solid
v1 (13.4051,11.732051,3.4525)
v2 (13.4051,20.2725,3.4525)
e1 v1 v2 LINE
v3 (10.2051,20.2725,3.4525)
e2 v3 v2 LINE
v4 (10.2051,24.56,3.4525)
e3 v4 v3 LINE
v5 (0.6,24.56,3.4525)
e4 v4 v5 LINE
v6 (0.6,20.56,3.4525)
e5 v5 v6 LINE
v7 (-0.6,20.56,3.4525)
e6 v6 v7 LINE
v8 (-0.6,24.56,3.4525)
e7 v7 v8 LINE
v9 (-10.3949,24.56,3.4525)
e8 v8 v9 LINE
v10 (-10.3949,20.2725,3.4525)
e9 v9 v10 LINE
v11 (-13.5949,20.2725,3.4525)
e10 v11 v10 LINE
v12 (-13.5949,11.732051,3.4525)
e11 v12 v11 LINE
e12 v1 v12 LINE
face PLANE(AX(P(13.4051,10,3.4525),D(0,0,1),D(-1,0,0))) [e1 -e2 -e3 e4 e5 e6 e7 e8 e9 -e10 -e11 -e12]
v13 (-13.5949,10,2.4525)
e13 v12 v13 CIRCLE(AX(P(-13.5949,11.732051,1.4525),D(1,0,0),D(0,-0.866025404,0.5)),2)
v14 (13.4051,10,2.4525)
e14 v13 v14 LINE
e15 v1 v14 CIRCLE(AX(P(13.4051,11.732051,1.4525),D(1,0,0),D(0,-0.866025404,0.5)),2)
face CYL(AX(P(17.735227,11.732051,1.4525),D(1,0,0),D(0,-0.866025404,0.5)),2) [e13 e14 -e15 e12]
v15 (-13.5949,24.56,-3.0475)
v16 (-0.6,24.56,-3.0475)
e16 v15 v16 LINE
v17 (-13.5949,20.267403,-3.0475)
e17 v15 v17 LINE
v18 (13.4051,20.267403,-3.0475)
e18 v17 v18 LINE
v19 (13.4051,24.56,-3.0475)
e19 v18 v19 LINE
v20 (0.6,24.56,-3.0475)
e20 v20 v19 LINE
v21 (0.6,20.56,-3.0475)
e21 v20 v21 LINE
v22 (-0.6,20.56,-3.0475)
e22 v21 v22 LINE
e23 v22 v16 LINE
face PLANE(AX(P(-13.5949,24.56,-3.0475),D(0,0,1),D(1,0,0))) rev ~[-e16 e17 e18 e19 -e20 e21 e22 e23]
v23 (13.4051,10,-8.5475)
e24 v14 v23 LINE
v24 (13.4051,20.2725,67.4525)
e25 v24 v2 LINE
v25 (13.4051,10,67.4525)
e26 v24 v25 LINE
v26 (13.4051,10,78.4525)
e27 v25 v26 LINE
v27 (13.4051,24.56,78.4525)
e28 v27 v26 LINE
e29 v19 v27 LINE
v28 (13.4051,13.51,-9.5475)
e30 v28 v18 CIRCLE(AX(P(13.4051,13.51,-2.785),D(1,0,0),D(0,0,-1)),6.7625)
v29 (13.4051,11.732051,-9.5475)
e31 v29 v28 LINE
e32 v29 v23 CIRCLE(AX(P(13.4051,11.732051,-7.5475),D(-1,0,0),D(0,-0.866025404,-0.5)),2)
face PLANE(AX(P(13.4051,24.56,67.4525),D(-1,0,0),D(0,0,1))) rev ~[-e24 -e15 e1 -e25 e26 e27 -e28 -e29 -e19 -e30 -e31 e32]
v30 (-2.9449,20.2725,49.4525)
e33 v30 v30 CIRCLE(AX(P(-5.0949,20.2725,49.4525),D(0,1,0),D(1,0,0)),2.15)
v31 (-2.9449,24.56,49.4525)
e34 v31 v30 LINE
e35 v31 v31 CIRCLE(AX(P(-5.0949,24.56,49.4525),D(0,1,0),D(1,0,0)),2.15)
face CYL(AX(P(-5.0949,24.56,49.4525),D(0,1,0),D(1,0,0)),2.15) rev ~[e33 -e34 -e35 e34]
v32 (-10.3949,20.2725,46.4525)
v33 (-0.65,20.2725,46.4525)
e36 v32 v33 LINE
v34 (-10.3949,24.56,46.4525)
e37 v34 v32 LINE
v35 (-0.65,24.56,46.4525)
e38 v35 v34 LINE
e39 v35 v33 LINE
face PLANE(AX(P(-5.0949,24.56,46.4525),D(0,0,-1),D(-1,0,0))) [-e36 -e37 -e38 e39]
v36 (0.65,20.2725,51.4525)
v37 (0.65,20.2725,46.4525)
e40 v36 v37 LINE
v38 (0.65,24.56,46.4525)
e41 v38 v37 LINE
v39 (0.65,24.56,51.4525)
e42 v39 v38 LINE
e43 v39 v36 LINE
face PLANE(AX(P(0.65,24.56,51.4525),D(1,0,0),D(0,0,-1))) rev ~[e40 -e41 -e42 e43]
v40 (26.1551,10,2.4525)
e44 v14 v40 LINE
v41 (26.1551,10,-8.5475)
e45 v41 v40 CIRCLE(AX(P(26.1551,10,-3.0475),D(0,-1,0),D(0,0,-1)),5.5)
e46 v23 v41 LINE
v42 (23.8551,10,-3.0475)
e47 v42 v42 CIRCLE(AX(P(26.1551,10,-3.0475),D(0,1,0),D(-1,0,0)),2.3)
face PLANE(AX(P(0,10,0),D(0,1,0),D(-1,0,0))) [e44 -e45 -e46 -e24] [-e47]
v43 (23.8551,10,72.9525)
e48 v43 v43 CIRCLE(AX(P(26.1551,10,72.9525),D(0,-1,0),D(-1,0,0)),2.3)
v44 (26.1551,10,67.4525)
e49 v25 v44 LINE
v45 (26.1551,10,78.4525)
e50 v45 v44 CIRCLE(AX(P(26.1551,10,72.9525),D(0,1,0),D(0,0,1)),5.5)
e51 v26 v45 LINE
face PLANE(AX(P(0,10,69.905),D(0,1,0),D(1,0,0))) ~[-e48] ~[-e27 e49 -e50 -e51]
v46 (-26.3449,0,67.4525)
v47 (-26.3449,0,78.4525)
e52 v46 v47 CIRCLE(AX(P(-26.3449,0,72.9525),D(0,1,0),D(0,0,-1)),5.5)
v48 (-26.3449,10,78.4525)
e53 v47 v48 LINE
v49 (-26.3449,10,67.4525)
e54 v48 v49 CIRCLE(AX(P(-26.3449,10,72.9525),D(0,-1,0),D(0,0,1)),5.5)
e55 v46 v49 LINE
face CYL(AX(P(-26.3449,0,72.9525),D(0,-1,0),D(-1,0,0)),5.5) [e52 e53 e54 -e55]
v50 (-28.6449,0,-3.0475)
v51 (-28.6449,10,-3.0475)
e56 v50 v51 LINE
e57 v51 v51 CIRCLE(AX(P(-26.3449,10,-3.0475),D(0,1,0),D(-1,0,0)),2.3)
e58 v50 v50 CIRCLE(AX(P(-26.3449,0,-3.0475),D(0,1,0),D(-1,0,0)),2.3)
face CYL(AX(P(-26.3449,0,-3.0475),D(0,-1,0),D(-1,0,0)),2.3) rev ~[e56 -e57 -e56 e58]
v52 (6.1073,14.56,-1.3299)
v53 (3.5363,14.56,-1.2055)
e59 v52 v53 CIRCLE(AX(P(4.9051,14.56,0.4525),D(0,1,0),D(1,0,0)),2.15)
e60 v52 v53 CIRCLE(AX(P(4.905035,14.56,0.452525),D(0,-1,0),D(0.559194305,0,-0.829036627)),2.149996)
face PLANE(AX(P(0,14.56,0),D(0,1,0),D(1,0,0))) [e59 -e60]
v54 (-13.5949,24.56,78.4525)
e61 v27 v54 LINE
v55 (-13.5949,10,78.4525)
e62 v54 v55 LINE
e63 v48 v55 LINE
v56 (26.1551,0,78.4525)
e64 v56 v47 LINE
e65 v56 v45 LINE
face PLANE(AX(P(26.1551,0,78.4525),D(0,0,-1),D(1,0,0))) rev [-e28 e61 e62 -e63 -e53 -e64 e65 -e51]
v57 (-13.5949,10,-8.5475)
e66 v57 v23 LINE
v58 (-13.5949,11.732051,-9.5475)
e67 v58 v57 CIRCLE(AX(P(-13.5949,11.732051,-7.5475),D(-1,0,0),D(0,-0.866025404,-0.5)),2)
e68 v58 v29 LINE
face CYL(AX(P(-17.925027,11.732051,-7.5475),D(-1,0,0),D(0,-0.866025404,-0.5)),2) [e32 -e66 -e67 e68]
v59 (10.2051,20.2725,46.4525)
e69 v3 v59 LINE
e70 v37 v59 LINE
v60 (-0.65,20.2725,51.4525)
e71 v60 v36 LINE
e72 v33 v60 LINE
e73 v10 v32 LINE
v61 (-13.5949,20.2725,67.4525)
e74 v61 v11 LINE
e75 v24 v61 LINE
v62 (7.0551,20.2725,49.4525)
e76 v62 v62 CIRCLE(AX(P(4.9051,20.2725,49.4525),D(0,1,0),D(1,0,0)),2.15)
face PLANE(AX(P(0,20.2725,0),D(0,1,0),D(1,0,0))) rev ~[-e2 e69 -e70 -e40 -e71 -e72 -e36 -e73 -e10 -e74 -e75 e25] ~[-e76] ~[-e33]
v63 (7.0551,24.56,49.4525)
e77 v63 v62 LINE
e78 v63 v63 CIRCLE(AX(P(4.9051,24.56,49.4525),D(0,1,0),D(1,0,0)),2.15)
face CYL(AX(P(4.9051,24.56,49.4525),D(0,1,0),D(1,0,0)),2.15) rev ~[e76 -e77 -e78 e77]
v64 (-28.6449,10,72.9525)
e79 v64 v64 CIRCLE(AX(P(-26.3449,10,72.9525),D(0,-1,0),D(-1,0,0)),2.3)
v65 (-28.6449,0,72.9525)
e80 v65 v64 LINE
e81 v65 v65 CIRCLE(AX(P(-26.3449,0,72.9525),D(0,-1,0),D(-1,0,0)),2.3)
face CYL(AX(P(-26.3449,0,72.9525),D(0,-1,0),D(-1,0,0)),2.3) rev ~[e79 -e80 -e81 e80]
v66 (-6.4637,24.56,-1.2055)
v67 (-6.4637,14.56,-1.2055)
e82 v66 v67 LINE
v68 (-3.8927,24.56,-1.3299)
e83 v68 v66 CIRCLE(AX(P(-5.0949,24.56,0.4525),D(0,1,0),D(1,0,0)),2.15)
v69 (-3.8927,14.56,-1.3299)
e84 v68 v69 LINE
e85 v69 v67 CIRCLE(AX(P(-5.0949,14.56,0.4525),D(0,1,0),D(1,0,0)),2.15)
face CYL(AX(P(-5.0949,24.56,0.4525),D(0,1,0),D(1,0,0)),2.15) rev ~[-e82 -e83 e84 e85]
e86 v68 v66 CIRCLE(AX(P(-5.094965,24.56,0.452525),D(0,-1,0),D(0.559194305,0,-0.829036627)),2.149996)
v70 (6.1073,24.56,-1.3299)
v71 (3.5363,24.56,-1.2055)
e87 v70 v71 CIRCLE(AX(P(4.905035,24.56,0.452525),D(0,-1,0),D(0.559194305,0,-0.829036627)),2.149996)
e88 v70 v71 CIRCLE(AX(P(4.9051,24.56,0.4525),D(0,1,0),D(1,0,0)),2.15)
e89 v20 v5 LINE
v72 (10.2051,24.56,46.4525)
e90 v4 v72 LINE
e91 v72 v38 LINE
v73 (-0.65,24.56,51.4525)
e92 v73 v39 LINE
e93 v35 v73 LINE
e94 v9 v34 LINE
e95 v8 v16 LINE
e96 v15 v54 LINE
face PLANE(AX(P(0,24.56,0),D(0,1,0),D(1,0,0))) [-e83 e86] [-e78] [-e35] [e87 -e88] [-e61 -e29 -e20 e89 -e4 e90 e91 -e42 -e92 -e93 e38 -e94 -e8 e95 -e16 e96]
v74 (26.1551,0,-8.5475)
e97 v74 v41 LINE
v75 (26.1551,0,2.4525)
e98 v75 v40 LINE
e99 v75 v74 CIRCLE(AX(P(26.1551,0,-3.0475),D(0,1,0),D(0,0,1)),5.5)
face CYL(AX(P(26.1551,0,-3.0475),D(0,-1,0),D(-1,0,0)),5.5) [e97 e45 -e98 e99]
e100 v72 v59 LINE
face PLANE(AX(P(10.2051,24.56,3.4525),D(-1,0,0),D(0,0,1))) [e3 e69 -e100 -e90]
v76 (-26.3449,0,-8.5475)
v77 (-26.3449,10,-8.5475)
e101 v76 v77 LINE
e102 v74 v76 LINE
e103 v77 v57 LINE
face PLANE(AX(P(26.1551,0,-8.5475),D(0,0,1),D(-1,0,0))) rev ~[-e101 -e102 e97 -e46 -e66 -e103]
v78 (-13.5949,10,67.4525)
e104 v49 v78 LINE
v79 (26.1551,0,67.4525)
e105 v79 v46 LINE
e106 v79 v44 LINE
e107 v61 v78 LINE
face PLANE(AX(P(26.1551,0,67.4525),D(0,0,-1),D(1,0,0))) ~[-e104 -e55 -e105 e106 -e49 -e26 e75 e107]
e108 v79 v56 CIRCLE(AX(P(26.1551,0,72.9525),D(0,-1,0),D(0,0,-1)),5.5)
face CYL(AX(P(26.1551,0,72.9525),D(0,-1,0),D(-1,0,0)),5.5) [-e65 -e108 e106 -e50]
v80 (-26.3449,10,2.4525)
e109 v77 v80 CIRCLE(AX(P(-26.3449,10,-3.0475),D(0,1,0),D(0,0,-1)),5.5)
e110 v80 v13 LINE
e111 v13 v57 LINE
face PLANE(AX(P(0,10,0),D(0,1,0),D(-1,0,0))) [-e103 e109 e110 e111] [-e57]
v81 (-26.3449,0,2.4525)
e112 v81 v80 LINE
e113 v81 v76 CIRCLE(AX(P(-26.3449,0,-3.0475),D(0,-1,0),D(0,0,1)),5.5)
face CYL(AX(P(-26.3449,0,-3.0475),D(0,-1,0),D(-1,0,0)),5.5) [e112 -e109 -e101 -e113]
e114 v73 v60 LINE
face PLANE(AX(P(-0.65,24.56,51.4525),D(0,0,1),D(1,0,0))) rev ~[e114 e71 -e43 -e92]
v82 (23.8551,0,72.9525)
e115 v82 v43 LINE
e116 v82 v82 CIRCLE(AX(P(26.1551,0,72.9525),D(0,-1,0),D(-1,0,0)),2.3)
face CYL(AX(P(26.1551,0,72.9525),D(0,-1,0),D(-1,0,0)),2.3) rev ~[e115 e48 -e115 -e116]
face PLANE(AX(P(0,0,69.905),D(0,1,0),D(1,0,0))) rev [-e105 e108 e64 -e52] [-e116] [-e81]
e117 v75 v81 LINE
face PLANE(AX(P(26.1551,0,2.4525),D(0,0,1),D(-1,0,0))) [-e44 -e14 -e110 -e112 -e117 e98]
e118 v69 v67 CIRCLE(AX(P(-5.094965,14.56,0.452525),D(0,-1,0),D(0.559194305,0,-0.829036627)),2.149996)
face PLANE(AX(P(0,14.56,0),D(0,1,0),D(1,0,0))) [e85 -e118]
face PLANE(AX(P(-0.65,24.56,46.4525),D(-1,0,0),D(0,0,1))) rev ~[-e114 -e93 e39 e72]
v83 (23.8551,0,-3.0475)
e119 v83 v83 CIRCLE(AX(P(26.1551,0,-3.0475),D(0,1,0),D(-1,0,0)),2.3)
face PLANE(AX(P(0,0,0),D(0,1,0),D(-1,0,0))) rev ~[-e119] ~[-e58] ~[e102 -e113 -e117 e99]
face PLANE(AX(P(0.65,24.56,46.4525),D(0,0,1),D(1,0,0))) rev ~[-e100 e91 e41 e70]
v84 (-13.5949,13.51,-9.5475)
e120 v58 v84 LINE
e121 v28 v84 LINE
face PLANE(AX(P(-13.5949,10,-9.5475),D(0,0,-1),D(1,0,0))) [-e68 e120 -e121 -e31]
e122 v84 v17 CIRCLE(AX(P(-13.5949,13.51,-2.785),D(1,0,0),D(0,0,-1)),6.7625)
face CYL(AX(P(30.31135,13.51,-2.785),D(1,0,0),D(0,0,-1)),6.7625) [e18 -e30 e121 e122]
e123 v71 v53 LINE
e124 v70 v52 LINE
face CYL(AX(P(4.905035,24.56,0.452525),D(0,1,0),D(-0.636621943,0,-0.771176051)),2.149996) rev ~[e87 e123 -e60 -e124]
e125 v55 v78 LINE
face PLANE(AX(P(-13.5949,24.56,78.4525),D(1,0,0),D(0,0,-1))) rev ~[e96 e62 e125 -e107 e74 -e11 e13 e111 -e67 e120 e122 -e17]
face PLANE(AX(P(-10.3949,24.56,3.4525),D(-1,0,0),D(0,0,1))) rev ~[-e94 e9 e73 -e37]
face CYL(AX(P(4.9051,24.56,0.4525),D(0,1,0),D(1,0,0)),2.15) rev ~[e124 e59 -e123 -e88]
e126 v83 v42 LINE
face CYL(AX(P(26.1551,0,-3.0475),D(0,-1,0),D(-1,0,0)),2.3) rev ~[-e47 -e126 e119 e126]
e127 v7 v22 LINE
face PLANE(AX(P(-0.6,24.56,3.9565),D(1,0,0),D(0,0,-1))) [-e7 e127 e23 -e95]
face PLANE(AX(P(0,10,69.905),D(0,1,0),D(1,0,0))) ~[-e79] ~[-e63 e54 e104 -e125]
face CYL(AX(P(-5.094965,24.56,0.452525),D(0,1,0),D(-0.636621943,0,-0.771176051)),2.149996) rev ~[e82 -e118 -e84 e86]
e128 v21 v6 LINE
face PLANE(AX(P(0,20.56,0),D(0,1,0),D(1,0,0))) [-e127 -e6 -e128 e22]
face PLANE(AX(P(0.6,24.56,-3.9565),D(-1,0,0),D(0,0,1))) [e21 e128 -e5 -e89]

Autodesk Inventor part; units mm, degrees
ref_plane "YZ Plane" through (0, 0, 0) normal (1, 0, 0) x (0, 1, 0)
ref_plane "XZ Plane" through (0, 0, 0) normal (0, 1, 0) x (-1, 0, 0)
ref_plane "XY Plane" through (0, 0, 0) normal (0, 0, 1) x (1, 0, 0)
sketch "Sketch1" plane through (0, 0, 0) normal (0, 1, 0) x (-1, 0, 0)
  circle A0 centre (-26.1551, -3.0475) radius 2.3
  arc A1 (-34.9051, -0.0475) -> (-17.4051, -0.0475) centre (-26.1551, -0.0475) ccw
  arc A2 (17.5949, -0.0475) -> (35.0949, -0.0475) centre (26.3449, -0.0475) ccw
  circle A3 centre (26.3449, -3.0475) radius 2.3
  circle A4 centre (-26.1551, -3.0475) radius 2.3
  circle A5 centre (26.3449, -3.0475) radius 2.3
  circle A6 centre (26.3449, -0.0475) radius 8.75
  circle A7 centre (-26.1551, -0.0475) radius 8.75
  line L0 (-34.9051, -0.0475) -> (-17.4051, -0.0475)
  line L1 (17.5949, -0.0475) -> (35.0949, -0.0475)
  circle A8 centre (-26.1551, -3.0475) radius 5.5
  circle A9 centre (26.3449, -3.0475) radius 5.5
  line L2 (-26.1551, -8.5475) -> (26.3449, -8.5475)
  line L3 (-26.1551, 2.4525) -> (26.3449, 2.4525)
  point P0 (0, 0)
  dimension "d0" = 11
  dimension "d1" = 11
  dimension "d41" = 4.6
  dimension "d42" = 4.6
extrude "Extrusion1" add sketch "Sketch1" along normal blind 10 contours L2 A8 L0 A1 | A1 A7 L3 A6 A2 L2 | A7 L0 A8 L3 | A8 L0 | L0 A8 | A2 L1 A9 L2 | L3 A9 L1 A6 | A9 L1 | A9 L1 picked at (-18.6939, -1.0014) picked at (-20.5799, 1.133) picked at (18.8536, -1.0809) picked at (20.7697, 1.133)
sketch "Sketch2" plane through (0, 10, 0) normal (0, 1, 0) x (1, 0, 0)
  line L0 (26.1551, 8.5475) -> (-26.3449, 8.5475) projected
  line L1 (-26.3449, -2.4525) -> (26.1551, -2.4525) projected
  arc A0 (-26.3449, 8.5475) -> (-26.3449, -2.4525) centre (-26.3449, 3.0475) ccw projected
  arc A1 (26.1551, -2.4525) -> (26.1551, 8.5475) centre (26.1551, 3.0475) ccw projected
  line L2 (-31.8449, 3.0475) -> (31.6551, 3.0475)
  line L3 (13.4051, -3.4525) -> (-13.5949, -3.4525)
  line L4 (-13.5949, -3.4525) -> (-13.5949, 9.5475)
  line L5 (-13.5949, 9.5475) -> (13.4051, 9.5475)
  line L6 (13.4051, 9.5475) -> (13.4051, -3.4525)
  line L7 (13.4051, -3.4525) -> (-13.5949, 9.5475) construction
  line L8 (-13.5949, -3.4525) -> (13.4051, 9.5475) construction
  point P0 (0, 0)
  point P1 (-0.0949, 3.0475)
  dimension "d4" = 27
  dimension "d5" = 13
extrude "Extrusion2" add sketch "Sketch2" along normal blind 14.56 contours L6 L2 L4 L0 | L0 L4 L5 L6 | L6 L1 L4 L2 | L6 L3 L4 L1
fillet "Fillet1" radius 2 2 edges at (-0.0949, 10, 3.4525) (-0.0949, 10, -9.5475)
sketch "Sketch3" plane through (0, 24.56, 0) normal (0, 1, 0) x (1, 0, 0)
  arc A0 (-6.4637, 1.2055) -> (-3.8927, 1.3299) centre (-5.0949, -0.4525) ccw
  arc A1 (3.5363, 1.2055) -> (6.1073, 1.3299) centre (4.9051, -0.4525) ccw
  circle A2 centre (4.9051, -0.4525) radius 2.15
  circle A3 centre (-5.0949, -0.4525) radius 2.15
  line L0 (-13.5949, 9.5475) -> (-13.5949, -3.4525) projected
  line L1 (13.4051, 9.5475) -> (-13.5949, 9.5475) projected
  line L2 (-13.5949, -3.4525) -> (13.4051, -3.4525) projected
  line L3 (13.4051, -3.4525) -> (13.4051, 9.5475) projected
  point P0 (0, 0)
  point P1 (6.1073, 1.3299)
  point P2 (3.5363, 1.2055)
  point P3 (-3.8927, 1.3299)
  point P4 (-6.4637, 1.2055)
  dimension "d12" = 8.5
  dimension "d13" = 8.5
  dimension "d43" = 2.15
  dimension "d44" = 2.15
extrude "Extrusion3" cut sketch "Sketch3" against normal blind 10 contours A3 A0 | A2 A1
sketch "Sketch4" plane through (0, 24.56, 0) normal (0, 1, 0) x (1, 0, 0)
  line L0 (13.4051, 9.5475) -> (-13.5949, 9.5475) projected
  line L1 (-13.5949, -2.4525) -> (-13.5949, 8.5475) projected
  line L2 (13.4051, 9.5475) -> (-13.5949, 9.5475)
  line L3 (-13.5949, 9.5475) -> (-13.5949, 3.0475)
  line L4 (-13.5949, 3.0475) -> (13.4051, 3.0475)
  line L5 (13.4051, 3.0475) -> (13.4051, 9.5475)
  point P0 (0, 0)
extrude "Extrusion4" cut sketch "Sketch4" against normal blind 4.2875
fillet "Fillet2" radius 6.7625 1 edges at (-0.0949, 20.2725, -9.5475)
sketch "Sketch5" plane through (0, 24.56, 0) normal (0, 1, 0) x (1, 0, 0)
  line L0 (-13.5949, -3.4525) -> (13.4051, -3.4525) projected
  line L1 (-10.3949, -3.4525) -> (-10.3949, -67.4525)
  line L2 (10.2051, -3.4525) -> (10.2051, -67.4525)
  line L3 (-13.5949, 3.0475) -> (-13.5949, -3.4525) projected
  circle A0 centre (-5.0949, -49.4525) radius 2.15
  line L4 (13.4051, -3.4525) -> (13.4051, 3.0475) projected
  circle A1 centre (4.9051, -49.4525) radius 2.15
  circle A2 centre (4.9051, -49.4525) radius 3
  circle A3 centre (-5.0949, -49.4525) radius 3
  line L5 (-10.3949, -67.4525) -> (10.2051, -67.4525)
  line L6 (-10.3949, -67.4525) -> (-13.5949, -67.4525)
  line L7 (-13.5949, -67.4525) -> (-13.5949, -3.4525)
  line L8 (10.2051, -67.4525) -> (13.4051, -67.4525)
  line L9 (13.4051, -67.4525) -> (13.4051, -3.4525)
  line L10 (-5.0949, -46.4525) -> (4.9051, -46.4525)
  line L11 (10.2051, -46.4525) -> (-10.3949, -46.4525)
  line L12 (-0.65, -46.4525) -> (-0.65, -51.4525)
  line L13 (-0.65, -51.4525) -> (0.65, -51.4525)
  line L14 (0.65, -51.4525) -> (0.65, -46.4525)
  line L15 (0, -46.4525) -> (-0.65, -51.4525) construction
  line L16 (0, -46.4525) -> (0.65, -51.4525) construction
  point P0 (0, 0)
  point P1 (13.4051, -0.2025)
  point P2 (4.9051, -46.4525)
  dimension "d28" = 6
  dimension "d29" = 6
  dimension "d19" = 3.2
  dimension "d20" = 64
  dimension "d21" = 3.2
  dimension "d22" = 64
  dimension "d23" = 46
  dimension "d24" = 8.5
  dimension "d25" = 4.3
  dimension "d26" = 8.5
  dimension "d27" = 4.3
  dimension "d30" = 1.3
extrude "Extrusion5" add sketch "Sketch5" against normal blind 4.2875 contours L0 L1 L6 L7 | L0 L9 L8 L2 | A2 | A3 | L11 L10 L12 L13 L14 L2 L5 L1
sketch "Sketch6" plane through (0, 24.56, 0) normal (0, 1, 0) x (1, 0, 0)
  line L0 (13.4051, -67.4525) -> (-13.5949, -67.4525) projected
  line L1 (-13.5949, -67.4525) -> (13.4051, -67.4525)
  line L2 (13.4051, -67.4525) -> (13.4051, -78.4525)
  line L3 (13.4051, -78.4525) -> (-13.5949, -78.4525)
  line L4 (-13.5949, -78.4525) -> (-13.5949, -67.4525)
  circle A0 centre (26.1551, 3.0475) radius 2.3 projected
  circle A1 centre (-26.3449, 3.0475) radius 2.3 projected
  point P0 (0, 0)
  dimension "d34" = 11
extrude "Extrusion6" add sketch "Sketch6" against normal up to surface (14.56 mm away) contours L2 L3 L4 L0
ref_plane "Work Plane1" through (-13.5949, 24.56, 34.9525) normal (0, 0, 1) x (1, 0, 0)
sketch "Sketch7" plane through (0, 24.56, 0) normal (0, 1, 0) x (1, 0, 0)
  point P0 (0, 0)
mirror "Mirror1" about plane through (-13.5949, 24.56, 34.9525) normal (0, 0, 1) of "Extrusion1"
sketch "Sketch8" plane through (0, 24.56, 0) normal (0, 1, 0) x (1, 0, 0)
  line L0 (0.6, -3.9565) -> (-0.6, -3.9565)
  line L1 (-0.6, -3.9565) -> (-0.6, 3.9565)
  line L2 (-0.6, 3.9565) -> (0.6, 3.9565)
  line L3 (0.6, 3.9565) -> (0.6, -3.9565)
  line L4 (0.6, -3.9565) -> (-0.6, 3.9565) construction
  line L5 (-0.6, -3.9565) -> (0.6, 3.9565) construction
  point P0 (0, 0)
  dimension "d38" = 1.2
extrude "Extrusion7" cut sketch "Sketch8" against normal blind 4
properties part number "SERVO_MOUNT_TOBASE"
